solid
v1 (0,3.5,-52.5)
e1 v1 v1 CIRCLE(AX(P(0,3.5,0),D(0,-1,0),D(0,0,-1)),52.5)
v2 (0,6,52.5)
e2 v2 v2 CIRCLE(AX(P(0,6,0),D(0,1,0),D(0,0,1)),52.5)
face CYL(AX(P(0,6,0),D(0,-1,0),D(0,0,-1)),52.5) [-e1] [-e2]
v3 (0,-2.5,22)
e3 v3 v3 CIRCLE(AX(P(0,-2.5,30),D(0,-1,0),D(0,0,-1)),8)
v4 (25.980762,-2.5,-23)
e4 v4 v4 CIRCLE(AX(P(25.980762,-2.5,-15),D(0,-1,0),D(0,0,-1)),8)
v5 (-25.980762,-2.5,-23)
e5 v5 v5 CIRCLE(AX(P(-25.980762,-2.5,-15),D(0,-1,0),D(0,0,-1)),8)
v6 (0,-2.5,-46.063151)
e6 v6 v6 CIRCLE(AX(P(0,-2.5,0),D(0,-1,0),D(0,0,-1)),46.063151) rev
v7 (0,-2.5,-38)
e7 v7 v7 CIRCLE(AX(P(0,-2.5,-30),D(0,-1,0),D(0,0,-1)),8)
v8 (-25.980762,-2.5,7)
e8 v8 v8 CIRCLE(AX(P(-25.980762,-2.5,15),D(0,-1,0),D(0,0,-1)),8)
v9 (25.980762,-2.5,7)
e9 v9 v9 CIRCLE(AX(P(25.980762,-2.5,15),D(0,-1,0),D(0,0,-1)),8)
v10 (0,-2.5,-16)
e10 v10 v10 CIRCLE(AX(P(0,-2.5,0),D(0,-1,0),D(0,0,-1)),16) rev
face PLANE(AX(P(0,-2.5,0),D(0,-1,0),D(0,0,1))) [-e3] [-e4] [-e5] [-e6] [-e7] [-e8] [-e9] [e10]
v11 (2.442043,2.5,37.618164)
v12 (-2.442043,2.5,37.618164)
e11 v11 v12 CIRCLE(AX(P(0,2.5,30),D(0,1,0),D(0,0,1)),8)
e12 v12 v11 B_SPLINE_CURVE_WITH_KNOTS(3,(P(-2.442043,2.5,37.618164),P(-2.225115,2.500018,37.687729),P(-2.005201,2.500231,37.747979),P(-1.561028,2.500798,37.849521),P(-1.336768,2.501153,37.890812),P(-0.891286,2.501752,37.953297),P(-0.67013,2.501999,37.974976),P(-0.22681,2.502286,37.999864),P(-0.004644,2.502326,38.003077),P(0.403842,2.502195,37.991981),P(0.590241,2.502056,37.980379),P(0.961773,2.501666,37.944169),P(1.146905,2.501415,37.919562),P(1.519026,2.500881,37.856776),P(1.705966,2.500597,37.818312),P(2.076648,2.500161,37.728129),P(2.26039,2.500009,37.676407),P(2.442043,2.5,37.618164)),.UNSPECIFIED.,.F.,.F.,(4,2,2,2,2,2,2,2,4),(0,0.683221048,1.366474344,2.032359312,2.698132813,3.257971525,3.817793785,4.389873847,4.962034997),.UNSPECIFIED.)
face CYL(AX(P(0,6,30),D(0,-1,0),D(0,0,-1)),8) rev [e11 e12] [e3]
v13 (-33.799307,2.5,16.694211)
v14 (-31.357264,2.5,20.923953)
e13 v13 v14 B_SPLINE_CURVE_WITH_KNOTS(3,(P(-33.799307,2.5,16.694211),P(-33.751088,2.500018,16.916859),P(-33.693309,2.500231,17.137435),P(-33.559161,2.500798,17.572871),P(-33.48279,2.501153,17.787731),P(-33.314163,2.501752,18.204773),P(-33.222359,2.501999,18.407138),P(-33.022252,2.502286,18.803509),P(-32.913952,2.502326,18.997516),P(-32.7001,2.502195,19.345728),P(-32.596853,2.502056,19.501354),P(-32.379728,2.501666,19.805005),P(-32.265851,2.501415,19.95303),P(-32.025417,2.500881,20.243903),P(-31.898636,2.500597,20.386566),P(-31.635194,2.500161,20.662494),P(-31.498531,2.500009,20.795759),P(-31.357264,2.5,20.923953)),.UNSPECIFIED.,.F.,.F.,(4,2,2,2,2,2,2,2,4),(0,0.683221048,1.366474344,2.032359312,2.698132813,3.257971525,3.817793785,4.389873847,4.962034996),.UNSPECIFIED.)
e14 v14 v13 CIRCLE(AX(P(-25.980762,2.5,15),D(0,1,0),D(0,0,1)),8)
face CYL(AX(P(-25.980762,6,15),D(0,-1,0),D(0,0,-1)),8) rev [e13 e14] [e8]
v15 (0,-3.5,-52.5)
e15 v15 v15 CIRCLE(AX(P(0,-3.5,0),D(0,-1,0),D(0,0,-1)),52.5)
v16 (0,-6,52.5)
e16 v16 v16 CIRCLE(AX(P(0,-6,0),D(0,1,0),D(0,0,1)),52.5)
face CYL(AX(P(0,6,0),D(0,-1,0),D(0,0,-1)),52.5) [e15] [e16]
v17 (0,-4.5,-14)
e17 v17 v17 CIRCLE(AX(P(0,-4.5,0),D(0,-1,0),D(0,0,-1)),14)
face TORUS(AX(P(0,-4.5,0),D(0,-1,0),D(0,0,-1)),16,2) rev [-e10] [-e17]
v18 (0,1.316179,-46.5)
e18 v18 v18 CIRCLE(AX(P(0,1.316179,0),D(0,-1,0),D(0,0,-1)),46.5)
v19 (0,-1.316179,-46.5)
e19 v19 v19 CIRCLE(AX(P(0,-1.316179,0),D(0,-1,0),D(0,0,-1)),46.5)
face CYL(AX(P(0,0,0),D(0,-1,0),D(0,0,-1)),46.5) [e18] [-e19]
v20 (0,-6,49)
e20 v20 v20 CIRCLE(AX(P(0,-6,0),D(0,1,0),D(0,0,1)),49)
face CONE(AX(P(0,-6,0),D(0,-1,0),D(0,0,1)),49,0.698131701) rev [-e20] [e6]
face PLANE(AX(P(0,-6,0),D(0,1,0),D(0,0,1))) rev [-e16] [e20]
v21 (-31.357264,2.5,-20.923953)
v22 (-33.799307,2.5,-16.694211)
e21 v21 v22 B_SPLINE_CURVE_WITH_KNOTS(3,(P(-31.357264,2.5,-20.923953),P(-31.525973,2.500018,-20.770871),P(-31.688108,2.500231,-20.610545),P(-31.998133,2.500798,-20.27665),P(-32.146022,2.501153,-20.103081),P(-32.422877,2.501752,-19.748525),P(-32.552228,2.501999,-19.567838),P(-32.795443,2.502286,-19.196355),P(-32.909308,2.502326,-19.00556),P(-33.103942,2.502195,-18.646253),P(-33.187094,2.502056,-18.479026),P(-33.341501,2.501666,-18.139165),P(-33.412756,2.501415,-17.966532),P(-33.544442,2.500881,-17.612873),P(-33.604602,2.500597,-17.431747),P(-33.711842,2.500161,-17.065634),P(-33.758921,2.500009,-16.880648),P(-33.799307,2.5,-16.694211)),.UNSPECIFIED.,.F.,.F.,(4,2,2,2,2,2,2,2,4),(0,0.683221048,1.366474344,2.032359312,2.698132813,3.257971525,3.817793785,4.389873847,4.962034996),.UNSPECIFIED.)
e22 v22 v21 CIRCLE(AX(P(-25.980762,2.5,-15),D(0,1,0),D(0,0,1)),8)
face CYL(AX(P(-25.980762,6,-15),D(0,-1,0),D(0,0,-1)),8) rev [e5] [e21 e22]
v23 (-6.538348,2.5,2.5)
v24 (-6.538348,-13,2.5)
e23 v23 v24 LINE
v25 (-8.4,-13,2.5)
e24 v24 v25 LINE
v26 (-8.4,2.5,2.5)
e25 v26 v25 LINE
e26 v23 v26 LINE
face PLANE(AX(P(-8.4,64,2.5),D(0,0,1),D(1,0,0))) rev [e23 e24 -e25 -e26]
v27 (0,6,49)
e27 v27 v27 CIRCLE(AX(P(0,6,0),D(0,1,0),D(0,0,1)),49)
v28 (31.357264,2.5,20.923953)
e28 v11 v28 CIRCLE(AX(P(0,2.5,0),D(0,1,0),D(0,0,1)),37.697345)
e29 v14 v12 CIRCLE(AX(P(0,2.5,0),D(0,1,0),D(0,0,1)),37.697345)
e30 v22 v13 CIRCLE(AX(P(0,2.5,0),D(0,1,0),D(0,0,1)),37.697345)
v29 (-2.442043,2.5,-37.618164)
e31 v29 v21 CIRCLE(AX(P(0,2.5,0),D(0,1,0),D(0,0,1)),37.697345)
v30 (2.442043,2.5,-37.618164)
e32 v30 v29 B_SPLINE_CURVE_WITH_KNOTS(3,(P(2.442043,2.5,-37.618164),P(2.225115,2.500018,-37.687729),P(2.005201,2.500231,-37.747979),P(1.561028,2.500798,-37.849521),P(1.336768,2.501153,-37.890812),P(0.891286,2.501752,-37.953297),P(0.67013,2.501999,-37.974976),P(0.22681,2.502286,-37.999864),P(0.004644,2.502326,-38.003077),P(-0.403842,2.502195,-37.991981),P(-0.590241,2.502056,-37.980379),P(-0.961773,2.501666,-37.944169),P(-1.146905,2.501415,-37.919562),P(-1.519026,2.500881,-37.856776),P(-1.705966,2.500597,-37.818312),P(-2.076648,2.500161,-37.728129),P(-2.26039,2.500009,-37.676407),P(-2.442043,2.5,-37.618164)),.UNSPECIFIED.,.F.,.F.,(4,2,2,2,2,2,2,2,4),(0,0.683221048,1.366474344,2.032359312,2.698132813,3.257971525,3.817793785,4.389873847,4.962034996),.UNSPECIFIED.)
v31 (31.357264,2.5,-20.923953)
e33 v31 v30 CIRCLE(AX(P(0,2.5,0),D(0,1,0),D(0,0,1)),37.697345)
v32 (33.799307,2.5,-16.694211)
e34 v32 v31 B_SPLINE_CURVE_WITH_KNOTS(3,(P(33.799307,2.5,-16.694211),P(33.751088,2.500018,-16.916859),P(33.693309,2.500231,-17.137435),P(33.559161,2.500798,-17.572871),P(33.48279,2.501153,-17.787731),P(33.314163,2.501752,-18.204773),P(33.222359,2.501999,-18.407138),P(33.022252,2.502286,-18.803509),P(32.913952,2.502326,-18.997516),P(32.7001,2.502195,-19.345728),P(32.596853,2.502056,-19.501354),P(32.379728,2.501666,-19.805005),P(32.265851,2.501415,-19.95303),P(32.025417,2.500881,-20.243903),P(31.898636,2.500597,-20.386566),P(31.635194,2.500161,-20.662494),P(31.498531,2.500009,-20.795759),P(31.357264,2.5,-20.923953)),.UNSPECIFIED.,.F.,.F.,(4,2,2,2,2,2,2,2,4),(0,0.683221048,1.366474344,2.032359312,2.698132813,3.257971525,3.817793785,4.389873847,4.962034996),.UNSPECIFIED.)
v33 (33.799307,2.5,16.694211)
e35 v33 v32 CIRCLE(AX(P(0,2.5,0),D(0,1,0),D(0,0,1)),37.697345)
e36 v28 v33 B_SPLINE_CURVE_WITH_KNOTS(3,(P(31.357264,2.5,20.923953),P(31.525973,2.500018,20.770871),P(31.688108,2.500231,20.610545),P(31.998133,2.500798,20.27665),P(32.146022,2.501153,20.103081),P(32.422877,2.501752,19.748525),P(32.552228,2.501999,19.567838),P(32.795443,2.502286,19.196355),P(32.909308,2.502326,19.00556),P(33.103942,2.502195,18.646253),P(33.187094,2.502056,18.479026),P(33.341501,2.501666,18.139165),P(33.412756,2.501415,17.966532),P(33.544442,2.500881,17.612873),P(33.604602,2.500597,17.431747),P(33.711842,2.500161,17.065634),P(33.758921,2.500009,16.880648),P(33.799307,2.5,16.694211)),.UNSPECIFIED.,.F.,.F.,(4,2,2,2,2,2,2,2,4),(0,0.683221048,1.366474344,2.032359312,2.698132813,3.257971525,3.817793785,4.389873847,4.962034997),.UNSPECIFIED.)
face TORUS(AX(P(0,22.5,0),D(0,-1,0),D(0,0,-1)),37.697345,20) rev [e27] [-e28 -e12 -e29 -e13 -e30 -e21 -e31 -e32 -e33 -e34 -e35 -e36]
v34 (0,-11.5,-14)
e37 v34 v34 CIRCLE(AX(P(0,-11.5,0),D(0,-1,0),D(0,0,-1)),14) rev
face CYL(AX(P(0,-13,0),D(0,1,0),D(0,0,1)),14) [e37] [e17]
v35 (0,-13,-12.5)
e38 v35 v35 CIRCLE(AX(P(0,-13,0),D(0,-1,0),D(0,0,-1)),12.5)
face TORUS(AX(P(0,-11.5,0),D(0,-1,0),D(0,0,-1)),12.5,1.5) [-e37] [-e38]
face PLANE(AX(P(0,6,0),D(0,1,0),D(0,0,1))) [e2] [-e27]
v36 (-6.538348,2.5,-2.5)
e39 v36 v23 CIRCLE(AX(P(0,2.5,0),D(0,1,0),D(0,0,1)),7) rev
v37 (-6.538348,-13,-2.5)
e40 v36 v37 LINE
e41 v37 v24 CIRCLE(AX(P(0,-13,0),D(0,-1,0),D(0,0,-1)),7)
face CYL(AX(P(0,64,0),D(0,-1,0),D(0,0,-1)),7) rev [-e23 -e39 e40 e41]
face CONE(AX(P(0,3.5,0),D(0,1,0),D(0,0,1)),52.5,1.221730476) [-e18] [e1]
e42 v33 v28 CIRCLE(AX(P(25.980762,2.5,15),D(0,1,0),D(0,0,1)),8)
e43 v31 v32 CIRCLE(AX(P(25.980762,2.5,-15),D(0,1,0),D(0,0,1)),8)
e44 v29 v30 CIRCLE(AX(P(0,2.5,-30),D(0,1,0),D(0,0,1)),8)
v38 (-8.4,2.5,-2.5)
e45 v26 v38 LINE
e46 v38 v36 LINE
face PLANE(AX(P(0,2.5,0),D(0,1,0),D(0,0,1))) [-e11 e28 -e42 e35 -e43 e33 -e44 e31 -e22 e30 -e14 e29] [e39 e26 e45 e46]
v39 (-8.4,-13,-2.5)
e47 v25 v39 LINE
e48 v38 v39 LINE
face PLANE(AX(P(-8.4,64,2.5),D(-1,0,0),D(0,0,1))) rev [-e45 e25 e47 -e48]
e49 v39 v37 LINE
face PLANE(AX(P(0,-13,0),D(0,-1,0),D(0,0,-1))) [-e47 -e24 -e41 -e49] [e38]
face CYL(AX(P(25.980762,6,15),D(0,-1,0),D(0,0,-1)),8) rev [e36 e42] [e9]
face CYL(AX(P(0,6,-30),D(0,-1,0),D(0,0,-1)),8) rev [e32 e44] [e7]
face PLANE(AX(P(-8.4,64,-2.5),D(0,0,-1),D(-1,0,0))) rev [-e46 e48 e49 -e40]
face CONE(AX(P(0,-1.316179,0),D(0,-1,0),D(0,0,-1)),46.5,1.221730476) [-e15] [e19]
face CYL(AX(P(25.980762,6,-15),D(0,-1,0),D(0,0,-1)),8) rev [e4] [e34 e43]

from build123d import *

# Parameters (mm, degrees)
SKETCH1_R               = 52.5
SKETCH1_R_2             = 8
BOSS_EXTRUDE1_DEPTH     = 6
SKETCH2_R               = 14
BOSS_EXTRUDE2_DEPTH     = 7
CUT_EXTRUDE1_DEPTH      = 77
SKETCH4_R               = 49
CUT_EXTRUDE2_DEPTH      = 3.5
CUT_EXTRUDE2_DRAFT      = -40
FILLET1_R               = 20
MIRROR1_COPY_1_SKETCH_R = 49
MIRROR1_COPY_1_DEPTH    = 3.5
MIRROR1_COPY_1_DRAFT    = -40
SKETCH6_R               = 14
BOSS_EXTRUDE3_DEPTH     = 10.5
FILLET2_R               = 1.5
FILLET3_R               = 2


with BuildPart() as part:
    # Sketch1 → Boss-Extrude1 (new, symmetric)
    with BuildSketch(Plane(origin=(0, 0, 0), x_dir=(1, 0, 0), z_dir=(0, 1, 0))):
        with Locations(Location((0, 0, 0), (0, 0, 270))):
            Circle(SKETCH1_R)
        with Locations(Location((0, 30, 0), (0, 0, 270))):
            Circle(SKETCH1_R_2, mode=Mode.SUBTRACT)
        with Locations(Location((25.980762114, 15, 0), (0, 0, 270))):
            Circle(SKETCH1_R_2, mode=Mode.SUBTRACT)
        with Locations(Location((25.980762114, -15, 0), (0, 0, 270))):
            Circle(SKETCH1_R_2, mode=Mode.SUBTRACT)
        with Locations(Location((0, -30, 0), (0, 0, 270))):
            Circle(SKETCH1_R_2, mode=Mode.SUBTRACT)
        with Locations(Location((-25.980762114, -15, 0), (0, 0, 270))):
            Circle(SKETCH1_R_2, mode=Mode.SUBTRACT)
        with Locations(Location((-25.980762114, 15, 0), (0, 0, 270))):
            Circle(SKETCH1_R_2, mode=Mode.SUBTRACT)
    extrude(amount=BOSS_EXTRUDE1_DEPTH, both=True)

    # Sketch2 → Boss-Extrude2 (add)
    with BuildSketch(Plane.XZ.offset(6)):
        with Locations(Location((0, 0, 0), (0, 0, 270))):
            Circle(SKETCH2_R)
    extrude(amount=BOSS_EXTRUDE2_DEPTH)

    # Sketch3 → Cut-Extrude1 (cut)
    with BuildSketch(Plane.XZ.offset(13)):
        with BuildLine():
            Line((-8.4, 2.5), (-8.4, -2.5))
            Line((-8.4, -2.5), (-6.538348415, -2.5))
            ThreePointArc((-6.538348415, -2.5), (7, 0), (-6.538348415, 2.5))
            Line((-6.538348415, 2.5), (-8.4, 2.5))
        make_face()
    extrude(amount=-CUT_EXTRUDE1_DEPTH, mode=Mode.SUBTRACT)


with BuildPart() as cut_extrude2_tool:
    # Sketch4 → Cut-Extrude2 (with draft: the straight prism first)
    with BuildSketch(Plane(origin=(0, 6, 0), x_dir=(1, 0, 0), z_dir=(0, 1, 0))):
        Circle(SKETCH4_R)
    extrude(amount=-CUT_EXTRUDE2_DEPTH)
    # Cut-Extrude2: the draft: its side faces are tilted about the plane it starts from
    cut_extrude2_sides = [cut_extrude2_tool.faces().sort_by_distance(p)[0] for p in [
        (-49, 4.25, 0),
    ]]
    draft(cut_extrude2_sides, Plane(origin=(0, 6, 0), x_dir=(1, 0, 0), z_dir=(0, 1, 0)), CUT_EXTRUDE2_DRAFT)


with BuildPart() as part_1:
    add(part.part)

    # Cut-Extrude2: cut by cut_extrude2_tool
    add(cut_extrude2_tool.part, mode=Mode.SUBTRACT)

    # Fillet1
    # the kernel refuses this fillet: 20 mm, written as the material it adds along each edge
    with BuildSketch(Plane(origin=(0, 2.5, 0), x_dir=(1, 0, 0), z_dir=(0, 0, 1))) as fillet1_piece_1_section:
        with BuildLine():
            CenterArc((37.697345445, 20), FILLET1_R, 270, 34.41150867)
            Line((37.697345445, 0), (37.697345445, -0.4))
            Line((37.697345445, -0.4), (46.063151291, -0.4))
            Line((46.063151291, -0.4), (46.369569068, -0.257115044))
            ThreePointArc((46.369569068, -0.257115044), (47.837993423, 1.492884956), (49.226053091, 3.17))
            Line((49.226053091, 3.17), (49, 3.5))
        make_face()
    fillet1_piece_1 = revolve(axis=Axis((0, 2.5, 0), (0, 1, 0)), mode=Mode.PRIVATE)
    fillet1_piece_1 = fillet1_piece_1 - Plane(origin=(-25.980762114, 3.249062711, 15), x_dir=(0, 0, 1), z_dir=(0, -1, 0)) * Cylinder(8, 197, mode=Mode.PRIVATE)
    fillet1_piece_1 = fillet1_piece_1 - Plane(origin=(0, 3.249062711, 30), x_dir=(0, 0, 1), z_dir=(0, -1, 0)) * Cylinder(8, 197, mode=Mode.PRIVATE)
    fillet1_piece_1 = fillet1_piece_1 - Plane(origin=(25.980762114, 3.249062711, 15), x_dir=(0, 0, 1), z_dir=(0, -1, 0)) * Cylinder(8, 197, mode=Mode.PRIVATE)
    fillet1_piece_1 = fillet1_piece_1 - Plane(origin=(-25.980762114, 3.249062711, -15), x_dir=(0, 0, 1), z_dir=(0, -1, 0)) * Cylinder(8, 197, mode=Mode.PRIVATE)
    fillet1_piece_1 = fillet1_piece_1 - Plane(origin=(0, 3.249062711, -30), x_dir=(0, 0, 1), z_dir=(0, -1, 0)) * Cylinder(8, 197, mode=Mode.PRIVATE)
    fillet1_piece_1 = fillet1_piece_1 - Plane(origin=(25.980762114, 3.249062711, -15), x_dir=(0, 0, 1), z_dir=(0, -1, 0)) * Cylinder(8, 197, mode=Mode.PRIVATE)
    add(fillet1_piece_1)


with BuildPart() as mirror1_copy_1_tool:
    # Mirror1 copy 1 sketch → Mirror1 copy 1 (with draft: the straight prism first)
    with BuildSketch(Plane.XZ.offset(6)):
        Circle(MIRROR1_COPY_1_SKETCH_R)
    extrude(amount=-MIRROR1_COPY_1_DEPTH)
    # Mirror1 copy 1: the draft: its side faces are tilted about the plane it starts from
    mirror1_copy_1_sides = [mirror1_copy_1_tool.faces().sort_by_distance(p)[0] for p in [
        (-49, -4.25, 0),
    ]]
    draft(mirror1_copy_1_sides, Plane.XZ.offset(6), MIRROR1_COPY_1_DRAFT)


with BuildPart() as part_2:
    add(part_1.part)

    # Mirror1 copy 1: cut by mirror1_copy_1_tool
    add(mirror1_copy_1_tool.part, mode=Mode.SUBTRACT)

    # Sketch5 → Cut-Revolve1 (revolve, cut)
    with BuildSketch(Plane.XY, mode=Mode.PRIVATE) as cut_revolve1_sk:
        Polygon((52.5, 3.5), (52.5, -3.5), (46.5, -1.316178594), (46.5, 1.316178594), align=None)
    revolve(cut_revolve1_sk.sketch.rotate(Axis((0, 0, 0), (0, 1, 0)), 90), axis=Axis((0, 0, 0), (0, 1, 0)), mode=Mode.SUBTRACT)

    # Sketch6 → Boss-Extrude3 (add)
    with BuildSketch(Plane.XZ.offset(13)):
        with Locations(Location((0, 0, 0), (0, 0, 270))):
            Circle(SKETCH6_R)
        with BuildLine():
            Line((-8.4, 2.5), (-8.4, -2.5))
            Line((-8.4, -2.5), (-6.538348415, -2.5))
            ThreePointArc((-6.538348415, -2.5), (7, 0), (-6.538348415, 2.5))
            Line((-6.538348415, 2.5), (-8.4, 2.5))
        make_face(mode=Mode.SUBTRACT)
    extrude(amount=-BOSS_EXTRUDE3_DEPTH)

    # Fillet2
    fillet2_edges = [part_2.edges().sort_by_distance(p)[0] for p in [
        (0, -13, 14),
    ]]
    fillet(fillet2_edges, radius=FILLET2_R)

    # Fillet3
    fillet3_edges = [part_2.edges().sort_by_distance(p)[0] for p in [
        (0, -2.5, 14),
    ]]
    fillet(fillet3_edges, radius=FILLET3_R)


solid = part_2.part
